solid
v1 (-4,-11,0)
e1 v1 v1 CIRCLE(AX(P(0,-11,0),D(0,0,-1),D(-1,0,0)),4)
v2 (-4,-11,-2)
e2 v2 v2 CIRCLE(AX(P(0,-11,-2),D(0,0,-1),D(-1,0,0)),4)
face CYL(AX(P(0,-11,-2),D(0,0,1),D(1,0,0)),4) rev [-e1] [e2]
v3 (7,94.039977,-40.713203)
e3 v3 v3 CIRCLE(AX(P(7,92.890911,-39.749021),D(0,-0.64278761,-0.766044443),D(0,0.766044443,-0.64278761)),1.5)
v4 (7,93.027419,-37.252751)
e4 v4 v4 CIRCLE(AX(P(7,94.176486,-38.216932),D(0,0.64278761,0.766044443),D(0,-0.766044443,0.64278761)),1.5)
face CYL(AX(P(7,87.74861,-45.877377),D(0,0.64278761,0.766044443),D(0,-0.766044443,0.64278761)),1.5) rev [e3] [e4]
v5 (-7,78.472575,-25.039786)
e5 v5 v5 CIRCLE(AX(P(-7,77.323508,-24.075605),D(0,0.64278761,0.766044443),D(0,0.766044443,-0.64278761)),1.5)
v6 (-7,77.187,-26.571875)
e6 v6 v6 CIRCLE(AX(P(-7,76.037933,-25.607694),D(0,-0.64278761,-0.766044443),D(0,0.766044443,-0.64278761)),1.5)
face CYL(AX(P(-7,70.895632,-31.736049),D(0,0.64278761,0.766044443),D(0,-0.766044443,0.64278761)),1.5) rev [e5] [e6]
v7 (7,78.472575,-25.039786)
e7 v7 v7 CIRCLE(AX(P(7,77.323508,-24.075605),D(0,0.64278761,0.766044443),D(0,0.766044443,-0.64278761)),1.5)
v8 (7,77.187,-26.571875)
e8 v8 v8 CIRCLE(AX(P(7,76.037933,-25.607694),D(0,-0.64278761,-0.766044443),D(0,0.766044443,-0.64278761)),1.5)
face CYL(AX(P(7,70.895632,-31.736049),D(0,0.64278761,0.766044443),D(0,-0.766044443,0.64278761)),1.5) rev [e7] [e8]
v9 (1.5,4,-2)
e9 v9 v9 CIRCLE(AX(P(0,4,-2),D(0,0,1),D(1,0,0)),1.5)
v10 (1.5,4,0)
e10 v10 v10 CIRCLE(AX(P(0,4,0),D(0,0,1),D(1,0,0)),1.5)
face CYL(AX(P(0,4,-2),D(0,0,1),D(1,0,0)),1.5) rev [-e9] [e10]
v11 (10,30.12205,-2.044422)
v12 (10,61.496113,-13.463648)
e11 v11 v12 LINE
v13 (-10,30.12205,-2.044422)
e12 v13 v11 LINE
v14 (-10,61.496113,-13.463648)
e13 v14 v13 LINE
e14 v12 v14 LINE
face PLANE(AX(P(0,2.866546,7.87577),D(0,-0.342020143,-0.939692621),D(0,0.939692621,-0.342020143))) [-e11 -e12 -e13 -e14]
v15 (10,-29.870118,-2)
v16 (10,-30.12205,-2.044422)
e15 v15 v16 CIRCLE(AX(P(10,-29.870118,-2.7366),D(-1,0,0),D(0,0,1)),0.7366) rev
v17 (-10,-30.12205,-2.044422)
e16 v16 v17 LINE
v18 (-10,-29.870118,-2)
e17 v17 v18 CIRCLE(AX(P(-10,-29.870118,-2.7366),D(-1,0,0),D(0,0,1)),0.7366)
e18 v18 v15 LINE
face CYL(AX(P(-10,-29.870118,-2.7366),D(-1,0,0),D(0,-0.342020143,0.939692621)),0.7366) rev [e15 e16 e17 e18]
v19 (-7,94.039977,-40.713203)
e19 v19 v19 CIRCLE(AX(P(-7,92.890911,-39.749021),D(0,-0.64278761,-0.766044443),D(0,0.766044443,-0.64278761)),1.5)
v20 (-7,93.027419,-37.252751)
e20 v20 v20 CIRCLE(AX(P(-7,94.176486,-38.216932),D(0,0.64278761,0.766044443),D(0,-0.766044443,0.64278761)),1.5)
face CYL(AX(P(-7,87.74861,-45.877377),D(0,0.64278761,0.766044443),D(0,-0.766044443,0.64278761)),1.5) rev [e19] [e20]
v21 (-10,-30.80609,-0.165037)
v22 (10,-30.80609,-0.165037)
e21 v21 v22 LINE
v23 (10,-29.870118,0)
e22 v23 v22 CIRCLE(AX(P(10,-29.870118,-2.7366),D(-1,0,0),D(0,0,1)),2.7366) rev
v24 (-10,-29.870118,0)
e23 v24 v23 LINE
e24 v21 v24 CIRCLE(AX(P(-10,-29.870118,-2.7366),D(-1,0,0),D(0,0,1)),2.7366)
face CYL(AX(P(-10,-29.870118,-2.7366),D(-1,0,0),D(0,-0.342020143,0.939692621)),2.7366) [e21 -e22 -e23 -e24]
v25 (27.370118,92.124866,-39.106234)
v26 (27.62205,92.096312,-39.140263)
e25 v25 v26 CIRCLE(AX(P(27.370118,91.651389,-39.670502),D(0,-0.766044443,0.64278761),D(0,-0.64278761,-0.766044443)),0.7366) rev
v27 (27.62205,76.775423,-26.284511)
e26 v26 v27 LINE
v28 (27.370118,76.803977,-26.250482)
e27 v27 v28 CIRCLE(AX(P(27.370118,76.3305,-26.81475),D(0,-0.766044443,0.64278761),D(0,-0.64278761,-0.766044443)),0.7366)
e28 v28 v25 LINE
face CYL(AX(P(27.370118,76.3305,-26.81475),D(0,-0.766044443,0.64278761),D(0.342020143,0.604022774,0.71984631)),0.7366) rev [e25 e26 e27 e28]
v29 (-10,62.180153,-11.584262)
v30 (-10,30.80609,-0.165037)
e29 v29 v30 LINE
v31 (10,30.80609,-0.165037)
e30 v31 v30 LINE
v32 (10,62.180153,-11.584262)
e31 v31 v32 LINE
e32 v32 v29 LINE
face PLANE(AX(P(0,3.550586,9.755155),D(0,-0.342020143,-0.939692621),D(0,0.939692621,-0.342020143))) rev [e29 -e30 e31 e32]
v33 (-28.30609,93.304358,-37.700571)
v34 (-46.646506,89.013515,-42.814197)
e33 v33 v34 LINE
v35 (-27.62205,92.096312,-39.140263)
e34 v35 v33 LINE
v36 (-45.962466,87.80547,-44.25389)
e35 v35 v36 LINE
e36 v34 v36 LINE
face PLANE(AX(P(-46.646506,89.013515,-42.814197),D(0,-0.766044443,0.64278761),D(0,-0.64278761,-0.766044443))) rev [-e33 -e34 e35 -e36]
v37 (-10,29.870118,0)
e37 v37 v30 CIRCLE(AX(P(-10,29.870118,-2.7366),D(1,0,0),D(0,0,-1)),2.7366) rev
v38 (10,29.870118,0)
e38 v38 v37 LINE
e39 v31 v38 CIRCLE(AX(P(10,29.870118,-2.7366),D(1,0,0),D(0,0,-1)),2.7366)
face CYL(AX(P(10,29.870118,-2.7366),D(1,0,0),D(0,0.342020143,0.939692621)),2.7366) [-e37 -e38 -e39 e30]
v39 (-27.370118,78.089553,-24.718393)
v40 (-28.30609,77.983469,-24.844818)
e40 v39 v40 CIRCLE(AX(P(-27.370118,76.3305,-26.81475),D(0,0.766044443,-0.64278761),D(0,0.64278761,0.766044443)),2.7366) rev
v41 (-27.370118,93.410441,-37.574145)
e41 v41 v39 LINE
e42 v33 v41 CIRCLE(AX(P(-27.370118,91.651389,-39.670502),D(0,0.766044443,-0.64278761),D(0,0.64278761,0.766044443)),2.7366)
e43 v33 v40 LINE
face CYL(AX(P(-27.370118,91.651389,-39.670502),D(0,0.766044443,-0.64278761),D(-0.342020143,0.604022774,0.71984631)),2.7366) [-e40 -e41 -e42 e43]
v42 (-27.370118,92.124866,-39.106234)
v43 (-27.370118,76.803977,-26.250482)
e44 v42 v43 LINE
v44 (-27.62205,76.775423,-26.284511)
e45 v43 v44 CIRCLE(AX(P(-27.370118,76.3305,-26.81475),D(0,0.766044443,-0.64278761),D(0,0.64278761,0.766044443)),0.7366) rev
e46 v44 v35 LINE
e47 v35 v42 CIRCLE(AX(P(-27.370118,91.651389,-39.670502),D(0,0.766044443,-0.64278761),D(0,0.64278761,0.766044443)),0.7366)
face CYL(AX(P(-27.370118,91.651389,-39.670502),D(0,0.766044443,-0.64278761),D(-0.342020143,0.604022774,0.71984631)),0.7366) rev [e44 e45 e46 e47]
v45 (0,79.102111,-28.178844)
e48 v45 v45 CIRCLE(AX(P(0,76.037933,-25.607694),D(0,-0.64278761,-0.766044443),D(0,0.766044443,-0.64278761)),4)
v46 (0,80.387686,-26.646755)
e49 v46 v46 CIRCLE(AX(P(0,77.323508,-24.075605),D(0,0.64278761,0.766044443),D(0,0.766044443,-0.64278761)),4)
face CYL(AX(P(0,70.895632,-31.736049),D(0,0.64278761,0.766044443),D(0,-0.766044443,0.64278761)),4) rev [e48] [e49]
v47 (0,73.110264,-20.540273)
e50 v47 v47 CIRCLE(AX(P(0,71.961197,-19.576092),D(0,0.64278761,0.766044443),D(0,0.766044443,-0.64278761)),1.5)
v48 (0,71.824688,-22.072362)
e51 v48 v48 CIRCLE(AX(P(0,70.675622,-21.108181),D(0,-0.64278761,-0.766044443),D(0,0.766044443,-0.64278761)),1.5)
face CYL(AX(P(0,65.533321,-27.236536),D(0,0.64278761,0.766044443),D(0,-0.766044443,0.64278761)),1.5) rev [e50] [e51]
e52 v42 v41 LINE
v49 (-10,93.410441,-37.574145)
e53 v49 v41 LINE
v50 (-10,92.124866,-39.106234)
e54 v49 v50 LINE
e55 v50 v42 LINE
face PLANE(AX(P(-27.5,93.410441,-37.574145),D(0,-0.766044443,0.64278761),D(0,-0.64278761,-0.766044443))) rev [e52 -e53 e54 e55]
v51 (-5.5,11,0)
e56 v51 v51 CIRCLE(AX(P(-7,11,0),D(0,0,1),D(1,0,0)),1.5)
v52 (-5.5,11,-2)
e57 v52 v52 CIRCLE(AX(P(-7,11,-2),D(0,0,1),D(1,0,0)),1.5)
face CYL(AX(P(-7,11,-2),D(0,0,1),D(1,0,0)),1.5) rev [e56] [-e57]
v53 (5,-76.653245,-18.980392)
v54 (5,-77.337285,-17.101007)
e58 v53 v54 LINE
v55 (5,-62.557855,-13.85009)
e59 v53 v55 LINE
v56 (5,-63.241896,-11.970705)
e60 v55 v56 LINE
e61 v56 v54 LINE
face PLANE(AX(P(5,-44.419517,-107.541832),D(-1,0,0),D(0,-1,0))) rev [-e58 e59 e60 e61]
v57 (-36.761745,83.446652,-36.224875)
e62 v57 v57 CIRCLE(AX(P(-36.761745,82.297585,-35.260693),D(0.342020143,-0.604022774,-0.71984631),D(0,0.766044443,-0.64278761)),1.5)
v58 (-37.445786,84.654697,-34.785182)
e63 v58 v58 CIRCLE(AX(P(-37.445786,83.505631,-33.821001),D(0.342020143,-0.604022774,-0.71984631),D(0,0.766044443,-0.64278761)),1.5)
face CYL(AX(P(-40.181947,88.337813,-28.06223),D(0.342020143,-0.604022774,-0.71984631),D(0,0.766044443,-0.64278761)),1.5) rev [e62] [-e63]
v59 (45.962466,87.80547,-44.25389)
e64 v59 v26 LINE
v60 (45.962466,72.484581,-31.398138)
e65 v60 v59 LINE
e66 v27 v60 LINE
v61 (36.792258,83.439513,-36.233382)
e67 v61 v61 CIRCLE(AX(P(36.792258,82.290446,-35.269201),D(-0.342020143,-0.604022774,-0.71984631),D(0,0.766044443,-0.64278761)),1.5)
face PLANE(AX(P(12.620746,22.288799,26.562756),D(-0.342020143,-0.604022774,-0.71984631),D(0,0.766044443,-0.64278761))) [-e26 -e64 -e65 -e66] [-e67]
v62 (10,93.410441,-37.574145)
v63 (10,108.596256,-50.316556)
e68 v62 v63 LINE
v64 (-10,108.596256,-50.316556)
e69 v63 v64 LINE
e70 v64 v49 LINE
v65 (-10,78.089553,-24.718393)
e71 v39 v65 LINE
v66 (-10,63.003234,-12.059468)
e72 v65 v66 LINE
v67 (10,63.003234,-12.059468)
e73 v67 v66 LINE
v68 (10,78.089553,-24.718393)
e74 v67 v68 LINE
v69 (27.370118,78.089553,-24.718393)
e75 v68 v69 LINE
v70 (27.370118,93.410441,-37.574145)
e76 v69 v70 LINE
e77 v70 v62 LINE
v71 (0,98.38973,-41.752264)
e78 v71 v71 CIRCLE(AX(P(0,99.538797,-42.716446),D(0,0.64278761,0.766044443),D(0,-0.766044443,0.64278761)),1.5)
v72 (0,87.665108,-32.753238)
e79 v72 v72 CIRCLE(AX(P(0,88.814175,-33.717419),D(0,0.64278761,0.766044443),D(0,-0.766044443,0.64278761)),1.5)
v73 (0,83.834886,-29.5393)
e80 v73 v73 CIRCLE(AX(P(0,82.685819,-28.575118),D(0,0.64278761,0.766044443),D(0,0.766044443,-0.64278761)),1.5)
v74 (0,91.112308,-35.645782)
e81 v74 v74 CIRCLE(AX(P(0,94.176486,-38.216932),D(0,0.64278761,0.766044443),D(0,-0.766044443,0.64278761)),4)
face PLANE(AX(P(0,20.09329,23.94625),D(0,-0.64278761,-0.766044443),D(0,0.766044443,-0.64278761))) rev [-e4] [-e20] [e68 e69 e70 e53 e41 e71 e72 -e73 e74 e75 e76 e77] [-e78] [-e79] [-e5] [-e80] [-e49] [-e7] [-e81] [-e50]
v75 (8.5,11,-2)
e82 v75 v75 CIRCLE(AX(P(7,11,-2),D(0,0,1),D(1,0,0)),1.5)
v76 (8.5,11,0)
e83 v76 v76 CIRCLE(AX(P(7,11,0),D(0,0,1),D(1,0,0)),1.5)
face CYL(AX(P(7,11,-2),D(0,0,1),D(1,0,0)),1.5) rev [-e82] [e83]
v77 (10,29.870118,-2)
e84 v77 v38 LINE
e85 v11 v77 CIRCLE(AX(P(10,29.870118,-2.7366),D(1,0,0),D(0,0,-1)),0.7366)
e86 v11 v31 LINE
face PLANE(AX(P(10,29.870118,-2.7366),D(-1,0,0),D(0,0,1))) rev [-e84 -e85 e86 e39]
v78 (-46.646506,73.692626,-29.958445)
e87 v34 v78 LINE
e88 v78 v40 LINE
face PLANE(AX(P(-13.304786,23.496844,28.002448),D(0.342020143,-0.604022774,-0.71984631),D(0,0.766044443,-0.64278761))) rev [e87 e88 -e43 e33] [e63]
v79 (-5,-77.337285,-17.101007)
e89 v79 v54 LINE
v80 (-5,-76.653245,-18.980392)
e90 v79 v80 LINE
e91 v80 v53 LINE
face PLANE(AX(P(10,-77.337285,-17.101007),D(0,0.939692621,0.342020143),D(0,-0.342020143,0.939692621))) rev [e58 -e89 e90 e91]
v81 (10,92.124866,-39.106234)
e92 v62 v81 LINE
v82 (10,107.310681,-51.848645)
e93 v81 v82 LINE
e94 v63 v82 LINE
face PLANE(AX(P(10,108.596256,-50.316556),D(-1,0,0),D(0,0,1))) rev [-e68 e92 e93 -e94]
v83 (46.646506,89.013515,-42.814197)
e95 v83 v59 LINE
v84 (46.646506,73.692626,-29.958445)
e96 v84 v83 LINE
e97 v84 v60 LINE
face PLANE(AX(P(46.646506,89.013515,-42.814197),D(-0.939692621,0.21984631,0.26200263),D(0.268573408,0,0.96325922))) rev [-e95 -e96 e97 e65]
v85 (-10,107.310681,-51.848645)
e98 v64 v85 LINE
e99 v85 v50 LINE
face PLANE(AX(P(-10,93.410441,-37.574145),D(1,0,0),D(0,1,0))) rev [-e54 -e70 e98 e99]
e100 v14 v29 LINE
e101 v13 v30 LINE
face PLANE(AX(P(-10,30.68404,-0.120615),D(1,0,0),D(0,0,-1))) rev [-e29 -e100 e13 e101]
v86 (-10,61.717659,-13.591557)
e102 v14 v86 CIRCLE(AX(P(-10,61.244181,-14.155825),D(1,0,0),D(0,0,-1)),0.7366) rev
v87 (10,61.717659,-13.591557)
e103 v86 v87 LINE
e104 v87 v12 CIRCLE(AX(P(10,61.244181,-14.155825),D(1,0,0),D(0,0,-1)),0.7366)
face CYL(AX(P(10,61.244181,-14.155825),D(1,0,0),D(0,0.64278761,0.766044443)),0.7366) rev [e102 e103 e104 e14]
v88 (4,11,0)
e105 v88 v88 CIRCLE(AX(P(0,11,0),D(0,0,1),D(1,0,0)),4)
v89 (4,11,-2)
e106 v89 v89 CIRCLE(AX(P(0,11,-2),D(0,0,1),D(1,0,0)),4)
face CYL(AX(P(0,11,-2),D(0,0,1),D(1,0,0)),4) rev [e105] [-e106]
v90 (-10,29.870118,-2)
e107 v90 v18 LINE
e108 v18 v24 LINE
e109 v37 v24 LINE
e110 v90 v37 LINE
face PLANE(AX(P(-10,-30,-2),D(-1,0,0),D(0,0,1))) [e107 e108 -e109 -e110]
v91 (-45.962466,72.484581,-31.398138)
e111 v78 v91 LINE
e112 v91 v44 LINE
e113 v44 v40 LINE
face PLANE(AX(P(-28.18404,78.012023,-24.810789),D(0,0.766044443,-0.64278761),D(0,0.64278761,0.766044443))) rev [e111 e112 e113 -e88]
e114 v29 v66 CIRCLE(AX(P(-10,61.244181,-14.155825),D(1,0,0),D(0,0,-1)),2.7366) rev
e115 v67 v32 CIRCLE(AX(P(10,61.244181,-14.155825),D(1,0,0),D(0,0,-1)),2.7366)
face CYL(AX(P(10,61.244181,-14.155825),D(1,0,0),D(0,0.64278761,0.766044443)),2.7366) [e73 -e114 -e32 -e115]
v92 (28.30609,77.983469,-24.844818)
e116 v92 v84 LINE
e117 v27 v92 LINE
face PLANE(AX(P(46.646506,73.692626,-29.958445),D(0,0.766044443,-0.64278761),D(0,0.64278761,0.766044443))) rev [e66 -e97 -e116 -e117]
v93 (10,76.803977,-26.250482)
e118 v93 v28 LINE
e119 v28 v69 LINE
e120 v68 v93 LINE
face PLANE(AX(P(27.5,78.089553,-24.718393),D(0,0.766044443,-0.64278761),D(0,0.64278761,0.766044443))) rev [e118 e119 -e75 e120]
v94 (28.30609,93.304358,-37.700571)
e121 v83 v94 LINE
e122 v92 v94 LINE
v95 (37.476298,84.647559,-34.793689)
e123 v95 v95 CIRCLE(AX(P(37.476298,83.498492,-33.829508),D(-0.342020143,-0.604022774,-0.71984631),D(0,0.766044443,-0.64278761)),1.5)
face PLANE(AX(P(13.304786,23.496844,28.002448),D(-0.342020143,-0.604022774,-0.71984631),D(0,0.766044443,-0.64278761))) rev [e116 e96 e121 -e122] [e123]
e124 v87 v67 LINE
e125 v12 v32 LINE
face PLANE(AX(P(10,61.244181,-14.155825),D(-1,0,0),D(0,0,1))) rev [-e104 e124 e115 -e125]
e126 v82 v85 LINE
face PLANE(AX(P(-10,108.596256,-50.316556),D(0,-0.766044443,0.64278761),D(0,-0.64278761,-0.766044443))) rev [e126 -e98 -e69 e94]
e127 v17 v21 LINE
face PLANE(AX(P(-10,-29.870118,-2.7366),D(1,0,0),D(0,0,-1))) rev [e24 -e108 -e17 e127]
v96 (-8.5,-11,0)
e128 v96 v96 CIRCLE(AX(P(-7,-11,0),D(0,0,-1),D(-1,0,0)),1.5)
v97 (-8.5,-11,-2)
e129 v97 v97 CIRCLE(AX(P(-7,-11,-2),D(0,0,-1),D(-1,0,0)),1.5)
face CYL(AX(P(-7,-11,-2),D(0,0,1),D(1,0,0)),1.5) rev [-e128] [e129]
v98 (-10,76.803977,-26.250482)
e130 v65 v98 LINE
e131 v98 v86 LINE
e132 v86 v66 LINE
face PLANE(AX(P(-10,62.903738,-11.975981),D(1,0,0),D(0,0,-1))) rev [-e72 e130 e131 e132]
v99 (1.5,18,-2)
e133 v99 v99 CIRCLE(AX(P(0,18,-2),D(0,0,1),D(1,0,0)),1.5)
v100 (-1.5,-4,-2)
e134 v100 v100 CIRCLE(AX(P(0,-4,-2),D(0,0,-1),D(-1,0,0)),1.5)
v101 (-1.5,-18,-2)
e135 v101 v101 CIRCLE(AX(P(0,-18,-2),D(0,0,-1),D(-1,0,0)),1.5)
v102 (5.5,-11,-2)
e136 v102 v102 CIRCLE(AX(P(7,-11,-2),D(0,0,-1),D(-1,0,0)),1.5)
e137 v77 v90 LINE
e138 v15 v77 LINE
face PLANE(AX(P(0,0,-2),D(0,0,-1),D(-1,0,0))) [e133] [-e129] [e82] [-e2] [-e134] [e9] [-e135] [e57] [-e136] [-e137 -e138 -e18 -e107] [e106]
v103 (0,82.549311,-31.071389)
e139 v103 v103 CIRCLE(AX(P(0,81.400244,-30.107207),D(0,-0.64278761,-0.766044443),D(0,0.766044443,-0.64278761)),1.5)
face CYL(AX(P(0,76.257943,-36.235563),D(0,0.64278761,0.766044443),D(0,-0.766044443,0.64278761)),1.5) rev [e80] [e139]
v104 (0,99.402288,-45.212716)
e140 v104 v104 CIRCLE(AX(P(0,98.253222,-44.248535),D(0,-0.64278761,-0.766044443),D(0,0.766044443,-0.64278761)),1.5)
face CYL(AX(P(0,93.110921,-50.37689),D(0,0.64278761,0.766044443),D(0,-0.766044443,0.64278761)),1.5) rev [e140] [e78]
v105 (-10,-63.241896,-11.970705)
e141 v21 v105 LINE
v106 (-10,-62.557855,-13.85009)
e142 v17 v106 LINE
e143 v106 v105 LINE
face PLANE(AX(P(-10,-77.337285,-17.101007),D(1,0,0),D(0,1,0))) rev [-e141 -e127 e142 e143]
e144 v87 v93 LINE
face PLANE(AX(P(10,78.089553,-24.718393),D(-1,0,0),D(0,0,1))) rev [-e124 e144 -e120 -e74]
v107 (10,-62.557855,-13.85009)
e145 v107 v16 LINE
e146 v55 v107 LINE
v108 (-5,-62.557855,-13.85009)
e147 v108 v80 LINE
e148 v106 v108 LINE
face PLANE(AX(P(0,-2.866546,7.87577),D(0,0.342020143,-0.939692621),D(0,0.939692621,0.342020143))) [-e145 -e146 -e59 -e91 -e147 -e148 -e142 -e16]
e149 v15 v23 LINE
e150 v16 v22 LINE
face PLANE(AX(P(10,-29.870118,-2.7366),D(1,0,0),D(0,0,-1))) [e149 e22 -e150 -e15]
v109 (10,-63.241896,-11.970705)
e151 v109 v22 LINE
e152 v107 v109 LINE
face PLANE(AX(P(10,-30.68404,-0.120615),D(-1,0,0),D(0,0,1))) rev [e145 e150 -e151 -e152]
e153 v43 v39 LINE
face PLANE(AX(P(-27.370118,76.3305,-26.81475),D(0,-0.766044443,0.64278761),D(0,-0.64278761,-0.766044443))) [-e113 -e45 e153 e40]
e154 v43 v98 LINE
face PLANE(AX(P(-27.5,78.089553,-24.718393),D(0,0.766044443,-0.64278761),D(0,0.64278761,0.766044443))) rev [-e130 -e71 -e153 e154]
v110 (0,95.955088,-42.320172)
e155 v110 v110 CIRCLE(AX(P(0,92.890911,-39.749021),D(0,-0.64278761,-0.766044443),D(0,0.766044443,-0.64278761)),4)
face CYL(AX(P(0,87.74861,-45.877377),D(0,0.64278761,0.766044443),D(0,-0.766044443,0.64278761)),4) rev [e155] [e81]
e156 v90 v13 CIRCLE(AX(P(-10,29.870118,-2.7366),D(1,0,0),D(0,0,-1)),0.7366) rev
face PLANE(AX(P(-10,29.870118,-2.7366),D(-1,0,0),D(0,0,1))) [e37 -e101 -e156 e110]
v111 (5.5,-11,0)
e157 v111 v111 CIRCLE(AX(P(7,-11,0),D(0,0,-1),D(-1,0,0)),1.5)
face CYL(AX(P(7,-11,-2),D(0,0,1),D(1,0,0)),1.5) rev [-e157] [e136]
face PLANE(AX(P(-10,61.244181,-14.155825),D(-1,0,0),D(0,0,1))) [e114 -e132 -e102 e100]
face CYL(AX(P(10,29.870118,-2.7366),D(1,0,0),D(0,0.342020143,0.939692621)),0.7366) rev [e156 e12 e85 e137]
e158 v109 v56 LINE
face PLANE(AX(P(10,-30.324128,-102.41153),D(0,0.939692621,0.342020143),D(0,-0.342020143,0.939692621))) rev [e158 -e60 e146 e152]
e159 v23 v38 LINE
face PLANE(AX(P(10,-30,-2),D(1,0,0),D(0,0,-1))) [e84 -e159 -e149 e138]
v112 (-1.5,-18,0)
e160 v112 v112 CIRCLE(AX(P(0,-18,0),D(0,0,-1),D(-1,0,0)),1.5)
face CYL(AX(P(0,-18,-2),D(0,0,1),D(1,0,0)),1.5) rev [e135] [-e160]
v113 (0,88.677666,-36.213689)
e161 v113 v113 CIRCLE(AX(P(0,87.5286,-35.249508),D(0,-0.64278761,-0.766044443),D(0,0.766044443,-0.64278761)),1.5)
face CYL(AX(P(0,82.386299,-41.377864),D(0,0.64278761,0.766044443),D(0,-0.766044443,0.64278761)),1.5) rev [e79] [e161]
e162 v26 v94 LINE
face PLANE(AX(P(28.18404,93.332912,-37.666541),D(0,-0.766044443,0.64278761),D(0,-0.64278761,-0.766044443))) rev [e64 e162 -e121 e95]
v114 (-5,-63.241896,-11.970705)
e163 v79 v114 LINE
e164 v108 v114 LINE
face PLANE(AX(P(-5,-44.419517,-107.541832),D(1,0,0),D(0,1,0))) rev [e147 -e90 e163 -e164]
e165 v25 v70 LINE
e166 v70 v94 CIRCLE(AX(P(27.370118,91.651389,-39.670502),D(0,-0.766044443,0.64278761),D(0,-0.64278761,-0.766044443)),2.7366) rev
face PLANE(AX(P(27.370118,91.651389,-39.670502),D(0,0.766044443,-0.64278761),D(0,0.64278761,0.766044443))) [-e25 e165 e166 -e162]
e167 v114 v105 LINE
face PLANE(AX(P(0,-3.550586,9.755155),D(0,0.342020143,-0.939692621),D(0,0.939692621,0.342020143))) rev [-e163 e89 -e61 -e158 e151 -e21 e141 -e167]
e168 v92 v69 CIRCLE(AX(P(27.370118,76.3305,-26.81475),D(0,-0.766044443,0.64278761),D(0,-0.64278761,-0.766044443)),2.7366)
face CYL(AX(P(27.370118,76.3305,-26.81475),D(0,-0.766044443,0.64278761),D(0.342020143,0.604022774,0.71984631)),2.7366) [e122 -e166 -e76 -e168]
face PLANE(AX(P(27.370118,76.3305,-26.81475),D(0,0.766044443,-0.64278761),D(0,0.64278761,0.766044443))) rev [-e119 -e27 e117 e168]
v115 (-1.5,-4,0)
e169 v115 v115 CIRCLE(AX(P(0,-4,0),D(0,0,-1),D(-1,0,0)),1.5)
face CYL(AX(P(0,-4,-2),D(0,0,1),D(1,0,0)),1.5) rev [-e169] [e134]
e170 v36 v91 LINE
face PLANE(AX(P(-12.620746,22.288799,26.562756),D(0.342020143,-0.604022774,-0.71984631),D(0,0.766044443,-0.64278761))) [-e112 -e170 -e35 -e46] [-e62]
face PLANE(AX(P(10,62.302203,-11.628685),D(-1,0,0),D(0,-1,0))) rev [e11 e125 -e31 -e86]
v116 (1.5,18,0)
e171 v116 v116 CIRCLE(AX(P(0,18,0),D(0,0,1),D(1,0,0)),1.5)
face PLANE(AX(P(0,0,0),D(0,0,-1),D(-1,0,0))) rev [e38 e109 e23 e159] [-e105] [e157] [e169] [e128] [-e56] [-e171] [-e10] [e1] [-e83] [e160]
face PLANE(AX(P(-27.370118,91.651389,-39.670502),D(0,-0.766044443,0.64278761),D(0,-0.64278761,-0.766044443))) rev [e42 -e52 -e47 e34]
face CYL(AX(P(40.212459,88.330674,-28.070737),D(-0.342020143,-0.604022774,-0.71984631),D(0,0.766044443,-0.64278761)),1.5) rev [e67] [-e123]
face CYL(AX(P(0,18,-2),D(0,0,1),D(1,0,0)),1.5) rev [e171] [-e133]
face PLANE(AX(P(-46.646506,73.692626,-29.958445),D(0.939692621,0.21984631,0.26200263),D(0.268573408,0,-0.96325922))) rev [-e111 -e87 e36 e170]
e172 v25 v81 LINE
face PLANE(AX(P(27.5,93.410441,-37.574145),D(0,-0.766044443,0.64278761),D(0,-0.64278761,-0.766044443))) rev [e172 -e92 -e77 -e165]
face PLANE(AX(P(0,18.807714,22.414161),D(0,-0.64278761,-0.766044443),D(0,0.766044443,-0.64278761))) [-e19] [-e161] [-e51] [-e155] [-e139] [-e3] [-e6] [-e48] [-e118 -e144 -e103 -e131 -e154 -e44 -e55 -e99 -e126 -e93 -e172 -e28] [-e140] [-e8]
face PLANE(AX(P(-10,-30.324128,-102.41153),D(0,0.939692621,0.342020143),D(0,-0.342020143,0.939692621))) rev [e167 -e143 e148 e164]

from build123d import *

# Parameters (mm, degrees)
SKETCH1_W                      = 20
SKETCH1_H                      = 60
BASE_FLANGE1_DEPTH             = 2
SKETCH2_R                      = 4
SKETCH2_R_2                    = 1.5
CUT_EXTRUDE1_DEPTH             = 2
EDGE_FLANGE1_STRIP_CUT_DEPTH   = 20
EDGE_FLANGE1_DEPTH             = 20
EDGE_FLANGE2_STRIP_CUT_DEPTH   = 20
EDGE_FLANGE2_DEPTH             = 20
EDGE_FLANGE3_STRIP_CUT_DEPTH   = 20
EDGE_FLANGE3_DEPTH             = 20
EDGE_FLANGE3_START             = 2
EDGE_FLANGE3_FLAT_DEPTH        = 2
EDGE_FLANGE4_STRIP_CUT_DEPTH   = 20
EDGE_FLANGE4_STRIP_CUT_2_DEPTH = 20
EDGE_FLANGE4_DEPTH             = 20
EDGE_FLANGE4_BEND_DEPTH        = 20
SKETCH16_W                     = 5
SKETCH16_H                     = 15
CUT_EXTRUDE2_DEPTH             = 137.190450876
SKETCH23_R                     = 4
SKETCH23_R_2                   = 1.5
CUT_EXTRUDE3_DEPTH             = 10
SKETCH24_R                     = 1.5
CUT_EXTRUDE4_DEPTH             = 10
SKETCH25_R                     = 1.5
CUT_EXTRUDE5_DEPTH             = 10


# Sheet-metal steps are written as plain solids
with BuildPart() as part:
    # Sketch1 → Base-Flange1 (new body)
    with BuildSketch(Plane.XY):
        Rectangle(SKETCH1_W, SKETCH1_H)
    extrude(amount=-BASE_FLANGE1_DEPTH)

    # Sketch2 → Cut-Extrude1 (cut)
    with BuildSketch(Plane.XY):
        with Locations((0, 11)):
            Circle(SKETCH2_R)
        with Locations((0, 18)):
            Circle(SKETCH2_R_2)
        with Locations((7, 11)):
            Circle(SKETCH2_R_2)
        with Locations((0, 4)):
            Circle(SKETCH2_R_2)
        with Locations((-7, 11)):
            Circle(SKETCH2_R_2)
        with Locations(Location((0, -18, 0), (0, 0, 180))):
            Circle(SKETCH2_R_2)
        with Locations(Location((7, -11, 0), (0, 0, 180))):
            Circle(SKETCH2_R_2)
        with Locations(Location((0, -4, 0), (0, 0, 180))):
            Circle(SKETCH2_R_2)
        with Locations(Location((0, -11, 0), (0, 0, 180))):
            Circle(SKETCH2_R)
        with Locations(Location((-7, -11, 0), (0, 0, 180))):
            Circle(SKETCH2_R_2)
    extrude(amount=-CUT_EXTRUDE1_DEPTH, mode=Mode.SUBTRACT)

    # Edge-Flange1 strip (across the edge) → Edge-Flange1 strip cut (cut)
    with BuildSketch(Plane(origin=(-10, 30, -2), x_dir=(0, -0.3420201433256626, -0.9396926207859106), z_dir=(1, 0, 0))):
        Polygon((-5.074988048, 8.095806265), (-1.834962826, -0.80608987), (0.044422416, -0.122049584), (-3.195602806, 8.779846552), align=None)
    extrude(amount=EDGE_FLANGE1_STRIP_CUT_DEPTH, mode=Mode.SUBTRACT)

    # Edge-Flange1 section (across the edge) → Edge-Flange1 (add)
    with BuildSketch(Plane(origin=(-10, 30, -2), x_dir=(0, -0.3420201433256626, -0.9396926207859106), z_dir=(1, 0, 0))):
        with BuildLine():
            Line((-2, 0.129882454), (-2, 33.647346039))
            Line((-2, 33.647346039), (0, 33.647346039))
            Line((0, 33.647346039), (0, 0.129882454))
            ThreePointArc((0, 0.129882454), (0.011190609, 0.001973206), (0.044422416, -0.122049584))
            Line((0.044422416, -0.122049584), (-1.834962826, -0.80608987))
            ThreePointArc((-1.834962826, -0.80608987), (-1.958424897, -0.345323149), (-2, 0.129882454))
        make_face()
    extrude(amount=EDGE_FLANGE1_DEPTH)

    # Edge-Flange2 strip (across the edge) → Edge-Flange2 strip cut (cut)
    with BuildSketch(Plane(origin=(10, -30, -2), x_dir=(0, 0.34202014332566344, -0.9396926207859103), z_dir=(-1, 0, 0))):
        Polygon((-5.074988048, 8.095806265), (-1.834962826, -0.80608987), (0.044422416, -0.122049584), (-3.195602806, 8.779846552), align=None)
    extrude(amount=EDGE_FLANGE2_STRIP_CUT_DEPTH, mode=Mode.SUBTRACT)

    # Edge-Flange2 section (across the edge) → Edge-Flange2 (add)
    with BuildSketch(Plane(origin=(10, -30, -2), x_dir=(0, 0.34202014332566344, -0.9396926207859103), z_dir=(-1, 0, 0))):
        with BuildLine():
            Line((-2, 0.129882454), (-2, 49.647346039))
            Line((-2, 49.647346039), (0, 49.647346039))
            Line((0, 49.647346039), (0, 0.129882454))
            ThreePointArc((0, 0.129882454), (0.011190609, 0.001973206), (0.044422416, -0.122049584))
            Line((0.044422416, -0.122049584), (-1.834962826, -0.80608987))
            ThreePointArc((-1.834962826, -0.80608987), (-1.958424897, -0.345323149), (-2, 0.129882454))
        make_face()
    extrude(amount=EDGE_FLANGE2_DEPTH)

    # Edge-Flange3 strip (across the edge) → Edge-Flange3 strip cut (cut)
    with BuildSketch(Plane(origin=(-10, 61.618162781, -13.508070115), x_dir=(0, -0.6427876096865297, -0.7660444431189862), z_dir=(1, 0, 0))):
        Polygon((-5.074988048, 8.095806265), (-1.834962826, -0.80608987), (0.044422416, -0.122049584), (-3.195602806, 8.779846552), align=None)
    extrude(amount=EDGE_FLANGE3_STRIP_CUT_DEPTH, mode=Mode.SUBTRACT)

    # Edge-Flange3 bend section (across the edge) → Edge-Flange3 (add)
    with BuildSketch(Plane(origin=(-10, 61.618162781, -13.508070115), x_dir=(0, -0.6427876096865297, -0.7660444431189862), z_dir=(1, 0, 0))):
        with BuildLine():
            Line((-2, 0.129882454), (0, 0.129882454))
            ThreePointArc((0, 0.129882454), (0.011190609, 0.001973206), (0.044422416, -0.122049584))
            Line((0.044422416, -0.122049584), (-1.834962826, -0.80608987))
            ThreePointArc((-1.834962826, -0.80608987), (-1.958424897, -0.345323149), (-2, 0.129882454))
        make_face()
    extrude(amount=EDGE_FLANGE3_DEPTH)

    # Edge-Flange3 profile (on flange) → Edge-Flange3 flat (add)
    with BuildSketch(Plane(origin=(0, 61.618162781, -13.508070115), x_dir=(1, 0, 0), z_dir=(0, 0.6427876096865297, 0.7660444431189862)).offset(EDGE_FLANGE3_START)):
        Polygon((10, 0.129882454), (10, 19.823673019), (27.5, 19.823673019), (27.5, 39.823673019), (10, 39.823673019), (10, 59.647346039), (-10, 59.647346039), (-10, 39.823673019), (-27.5, 39.823673019), (-27.5, 19.823673019), (-10, 19.823673019), (-10, 0.129882454), align=None)
    extrude(amount=-EDGE_FLANGE3_FLAT_DEPTH)

    # Edge-Flange4 strip (across the edge) → Edge-Flange4 strip cut (cut)
    with BuildSketch(Plane(origin=(27.5, 92.124866203, -39.106233704), x_dir=(-0.34202014332566305, -0.6040227735550457, -0.7198463103929635), z_dir=(0, -0.7660444431189863, 0.6427876096865295))):
        Polygon((-5.074988048, 8.095806265), (-1.834962826, -0.80608987), (0.044422416, -0.122049584), (-3.195602806, 8.779846552), align=None)
    extrude(amount=EDGE_FLANGE4_STRIP_CUT_DEPTH, mode=Mode.SUBTRACT)

    # Edge-Flange4 strip 2 (across the edge) → Edge-Flange4 strip cut 2 (cut)
    with BuildSketch(Plane(origin=(-27.5, 76.80397734, -26.25048151), x_dir=(0.34202014332566305, -0.6040227735550457, -0.7198463103929635), z_dir=(0, 0.7660444431189863, -0.6427876096865295))):
        Polygon((-5.074988048, 8.095806265), (-1.834962826, -0.80608987), (0.044422416, -0.122049584), (-3.195602806, 8.779846552), align=None)
    extrude(amount=EDGE_FLANGE4_STRIP_CUT_2_DEPTH, mode=Mode.SUBTRACT)

    # Edge-Flange4 section (across the edge) → Edge-Flange4 (add)
    with BuildSketch(Plane(origin=(27.5, 92.124866203, -39.106233704), x_dir=(-0.34202014332566305, -0.6040227735550457, -0.7198463103929635), z_dir=(0, -0.7660444431189863, 0.6427876096865295))):
        with BuildLine():
            Line((-2, 0.129882454), (-2, 19.647346039))
            Line((-2, 19.647346039), (0, 19.647346039))
            Line((0, 19.647346039), (0, 0.129882454))
            ThreePointArc((0, 0.129882454), (0.011190609, 0.001973206), (0.044422416, -0.122049584))
            Line((0.044422416, -0.122049584), (-1.834962826, -0.80608987))
            ThreePointArc((-1.834962826, -0.80608987), (-1.958424897, -0.345323149), (-2, 0.129882454))
        make_face()
    extrude(amount=EDGE_FLANGE4_DEPTH)

    # Edge-Flange4 section 2 (across the edge) → Edge-Flange4 bend (add)
    with BuildSketch(Plane(origin=(-27.5, 76.80397734, -26.25048151), x_dir=(0.34202014332566305, -0.6040227735550457, -0.7198463103929635), z_dir=(0, 0.7660444431189863, -0.6427876096865295))):
        with BuildLine():
            Line((-2, 0.129882454), (-2, 19.647346039))
            Line((-2, 19.647346039), (0, 19.647346039))
            Line((0, 19.647346039), (0, 0.129882454))
            ThreePointArc((0, 0.129882454), (0.011190609, 0.001973206), (0.044422416, -0.122049584))
            Line((0.044422416, -0.122049584), (-1.834962826, -0.80608987))
            ThreePointArc((-1.834962826, -0.80608987), (-1.958424897, -0.345323149), (-2, 0.129882454))
        make_face()
    extrude(amount=EDGE_FLANGE4_BEND_DEPTH)

    # Sketch16 → Cut-Extrude2 (cut, through all)
    with BuildSketch(Plane(origin=(0, -3.55058603, 9.755154944), x_dir=(1, 0, 0), z_dir=(0, -0.3420201433256634, 0.9396926207859103))):
        with Locations((-7.5, -71.022164949)):
            Rectangle(SKETCH16_W, SKETCH16_H)
        with Locations((7.5, -71.022164949)):
            Rectangle(SKETCH16_W, SKETCH16_H)
    extrude(amount=-CUT_EXTRUDE2_DEPTH, mode=Mode.SUBTRACT)

    # Sketch23 → Cut-Extrude3 (cut)
    with BuildSketch(Plane(origin=(0, 20.093289682, 23.946250166), x_dir=(1, 0, 0), z_dir=(0, 0.6427876096865298, 0.7660444431189862))):
        with Locations(Location((0, 96.708744314, 0), (0, 0, 270))):
            Circle(SKETCH23_R)
        with Locations(Location((0, 103.708744314, 0), (0, 0, 270))):
            Circle(SKETCH23_R_2)
        with Locations(Location((7, 96.708744314, 0), (0, 0, 270))):
            Circle(SKETCH23_R_2)
        with Locations(Location((0, 89.708744314, 0), (0, 0, 270))):
            Circle(SKETCH23_R_2)
        with Locations(Location((-7, 96.708744314, 0), (0, 0, 270))):
            Circle(SKETCH23_R_2)
        with Locations(Location((0, 74.708744314, 0), (0, 0, 90))):
            Circle(SKETCH23_R)
        with Locations(Location((7, 74.708744314, 0), (0, 0, 90))):
            Circle(SKETCH23_R_2)
        with Locations(Location((0, 81.708744314, 0), (0, 0, 90))):
            Circle(SKETCH23_R_2)
        with Locations(Location((-7, 74.708744314, 0), (0, 0, 90))):
            Circle(SKETCH23_R_2)
        with Locations(Location((0, 67.708744314, 0), (0, 0, 90))):
            Circle(SKETCH23_R_2)
    extrude(amount=-CUT_EXTRUDE3_DEPTH, mode=Mode.SUBTRACT)

    # Sketch24 → Cut-Extrude4 (cut)
    with BuildSketch(Plane(origin=(-12.620746139, 22.288798586, 26.56275579), x_dir=(-0.9396926207859104, -0.21984631039294733, -0.2620026302293839), z_dir=(0.3420201433256635, -0.6040227735550454, -0.7198463103929638))):
        with Locations(Location((25.690314863, 85.708744314, 0), (0, 0, 90))):
            Circle(SKETCH24_R)
    extrude(amount=-CUT_EXTRUDE4_DEPTH, mode=Mode.SUBTRACT)

    # Sketch25 → Cut-Extrude5 (cut)
    with BuildSketch(Plane(origin=(12.620746139, 22.288798586, 26.56275579), x_dir=(-0.9396926207859105, 0.21984631039294705, 0.26200263022938347), z_dir=(-0.342020143325663, -0.6040227735550456, -0.7198463103929638))):
        with Locations(Location((-25.722785477, 85.708744314, 0), (0, 0, 90))):
            Circle(SKETCH25_R)
    extrude(amount=-CUT_EXTRUDE5_DEPTH, mode=Mode.SUBTRACT)


solid = part.part
